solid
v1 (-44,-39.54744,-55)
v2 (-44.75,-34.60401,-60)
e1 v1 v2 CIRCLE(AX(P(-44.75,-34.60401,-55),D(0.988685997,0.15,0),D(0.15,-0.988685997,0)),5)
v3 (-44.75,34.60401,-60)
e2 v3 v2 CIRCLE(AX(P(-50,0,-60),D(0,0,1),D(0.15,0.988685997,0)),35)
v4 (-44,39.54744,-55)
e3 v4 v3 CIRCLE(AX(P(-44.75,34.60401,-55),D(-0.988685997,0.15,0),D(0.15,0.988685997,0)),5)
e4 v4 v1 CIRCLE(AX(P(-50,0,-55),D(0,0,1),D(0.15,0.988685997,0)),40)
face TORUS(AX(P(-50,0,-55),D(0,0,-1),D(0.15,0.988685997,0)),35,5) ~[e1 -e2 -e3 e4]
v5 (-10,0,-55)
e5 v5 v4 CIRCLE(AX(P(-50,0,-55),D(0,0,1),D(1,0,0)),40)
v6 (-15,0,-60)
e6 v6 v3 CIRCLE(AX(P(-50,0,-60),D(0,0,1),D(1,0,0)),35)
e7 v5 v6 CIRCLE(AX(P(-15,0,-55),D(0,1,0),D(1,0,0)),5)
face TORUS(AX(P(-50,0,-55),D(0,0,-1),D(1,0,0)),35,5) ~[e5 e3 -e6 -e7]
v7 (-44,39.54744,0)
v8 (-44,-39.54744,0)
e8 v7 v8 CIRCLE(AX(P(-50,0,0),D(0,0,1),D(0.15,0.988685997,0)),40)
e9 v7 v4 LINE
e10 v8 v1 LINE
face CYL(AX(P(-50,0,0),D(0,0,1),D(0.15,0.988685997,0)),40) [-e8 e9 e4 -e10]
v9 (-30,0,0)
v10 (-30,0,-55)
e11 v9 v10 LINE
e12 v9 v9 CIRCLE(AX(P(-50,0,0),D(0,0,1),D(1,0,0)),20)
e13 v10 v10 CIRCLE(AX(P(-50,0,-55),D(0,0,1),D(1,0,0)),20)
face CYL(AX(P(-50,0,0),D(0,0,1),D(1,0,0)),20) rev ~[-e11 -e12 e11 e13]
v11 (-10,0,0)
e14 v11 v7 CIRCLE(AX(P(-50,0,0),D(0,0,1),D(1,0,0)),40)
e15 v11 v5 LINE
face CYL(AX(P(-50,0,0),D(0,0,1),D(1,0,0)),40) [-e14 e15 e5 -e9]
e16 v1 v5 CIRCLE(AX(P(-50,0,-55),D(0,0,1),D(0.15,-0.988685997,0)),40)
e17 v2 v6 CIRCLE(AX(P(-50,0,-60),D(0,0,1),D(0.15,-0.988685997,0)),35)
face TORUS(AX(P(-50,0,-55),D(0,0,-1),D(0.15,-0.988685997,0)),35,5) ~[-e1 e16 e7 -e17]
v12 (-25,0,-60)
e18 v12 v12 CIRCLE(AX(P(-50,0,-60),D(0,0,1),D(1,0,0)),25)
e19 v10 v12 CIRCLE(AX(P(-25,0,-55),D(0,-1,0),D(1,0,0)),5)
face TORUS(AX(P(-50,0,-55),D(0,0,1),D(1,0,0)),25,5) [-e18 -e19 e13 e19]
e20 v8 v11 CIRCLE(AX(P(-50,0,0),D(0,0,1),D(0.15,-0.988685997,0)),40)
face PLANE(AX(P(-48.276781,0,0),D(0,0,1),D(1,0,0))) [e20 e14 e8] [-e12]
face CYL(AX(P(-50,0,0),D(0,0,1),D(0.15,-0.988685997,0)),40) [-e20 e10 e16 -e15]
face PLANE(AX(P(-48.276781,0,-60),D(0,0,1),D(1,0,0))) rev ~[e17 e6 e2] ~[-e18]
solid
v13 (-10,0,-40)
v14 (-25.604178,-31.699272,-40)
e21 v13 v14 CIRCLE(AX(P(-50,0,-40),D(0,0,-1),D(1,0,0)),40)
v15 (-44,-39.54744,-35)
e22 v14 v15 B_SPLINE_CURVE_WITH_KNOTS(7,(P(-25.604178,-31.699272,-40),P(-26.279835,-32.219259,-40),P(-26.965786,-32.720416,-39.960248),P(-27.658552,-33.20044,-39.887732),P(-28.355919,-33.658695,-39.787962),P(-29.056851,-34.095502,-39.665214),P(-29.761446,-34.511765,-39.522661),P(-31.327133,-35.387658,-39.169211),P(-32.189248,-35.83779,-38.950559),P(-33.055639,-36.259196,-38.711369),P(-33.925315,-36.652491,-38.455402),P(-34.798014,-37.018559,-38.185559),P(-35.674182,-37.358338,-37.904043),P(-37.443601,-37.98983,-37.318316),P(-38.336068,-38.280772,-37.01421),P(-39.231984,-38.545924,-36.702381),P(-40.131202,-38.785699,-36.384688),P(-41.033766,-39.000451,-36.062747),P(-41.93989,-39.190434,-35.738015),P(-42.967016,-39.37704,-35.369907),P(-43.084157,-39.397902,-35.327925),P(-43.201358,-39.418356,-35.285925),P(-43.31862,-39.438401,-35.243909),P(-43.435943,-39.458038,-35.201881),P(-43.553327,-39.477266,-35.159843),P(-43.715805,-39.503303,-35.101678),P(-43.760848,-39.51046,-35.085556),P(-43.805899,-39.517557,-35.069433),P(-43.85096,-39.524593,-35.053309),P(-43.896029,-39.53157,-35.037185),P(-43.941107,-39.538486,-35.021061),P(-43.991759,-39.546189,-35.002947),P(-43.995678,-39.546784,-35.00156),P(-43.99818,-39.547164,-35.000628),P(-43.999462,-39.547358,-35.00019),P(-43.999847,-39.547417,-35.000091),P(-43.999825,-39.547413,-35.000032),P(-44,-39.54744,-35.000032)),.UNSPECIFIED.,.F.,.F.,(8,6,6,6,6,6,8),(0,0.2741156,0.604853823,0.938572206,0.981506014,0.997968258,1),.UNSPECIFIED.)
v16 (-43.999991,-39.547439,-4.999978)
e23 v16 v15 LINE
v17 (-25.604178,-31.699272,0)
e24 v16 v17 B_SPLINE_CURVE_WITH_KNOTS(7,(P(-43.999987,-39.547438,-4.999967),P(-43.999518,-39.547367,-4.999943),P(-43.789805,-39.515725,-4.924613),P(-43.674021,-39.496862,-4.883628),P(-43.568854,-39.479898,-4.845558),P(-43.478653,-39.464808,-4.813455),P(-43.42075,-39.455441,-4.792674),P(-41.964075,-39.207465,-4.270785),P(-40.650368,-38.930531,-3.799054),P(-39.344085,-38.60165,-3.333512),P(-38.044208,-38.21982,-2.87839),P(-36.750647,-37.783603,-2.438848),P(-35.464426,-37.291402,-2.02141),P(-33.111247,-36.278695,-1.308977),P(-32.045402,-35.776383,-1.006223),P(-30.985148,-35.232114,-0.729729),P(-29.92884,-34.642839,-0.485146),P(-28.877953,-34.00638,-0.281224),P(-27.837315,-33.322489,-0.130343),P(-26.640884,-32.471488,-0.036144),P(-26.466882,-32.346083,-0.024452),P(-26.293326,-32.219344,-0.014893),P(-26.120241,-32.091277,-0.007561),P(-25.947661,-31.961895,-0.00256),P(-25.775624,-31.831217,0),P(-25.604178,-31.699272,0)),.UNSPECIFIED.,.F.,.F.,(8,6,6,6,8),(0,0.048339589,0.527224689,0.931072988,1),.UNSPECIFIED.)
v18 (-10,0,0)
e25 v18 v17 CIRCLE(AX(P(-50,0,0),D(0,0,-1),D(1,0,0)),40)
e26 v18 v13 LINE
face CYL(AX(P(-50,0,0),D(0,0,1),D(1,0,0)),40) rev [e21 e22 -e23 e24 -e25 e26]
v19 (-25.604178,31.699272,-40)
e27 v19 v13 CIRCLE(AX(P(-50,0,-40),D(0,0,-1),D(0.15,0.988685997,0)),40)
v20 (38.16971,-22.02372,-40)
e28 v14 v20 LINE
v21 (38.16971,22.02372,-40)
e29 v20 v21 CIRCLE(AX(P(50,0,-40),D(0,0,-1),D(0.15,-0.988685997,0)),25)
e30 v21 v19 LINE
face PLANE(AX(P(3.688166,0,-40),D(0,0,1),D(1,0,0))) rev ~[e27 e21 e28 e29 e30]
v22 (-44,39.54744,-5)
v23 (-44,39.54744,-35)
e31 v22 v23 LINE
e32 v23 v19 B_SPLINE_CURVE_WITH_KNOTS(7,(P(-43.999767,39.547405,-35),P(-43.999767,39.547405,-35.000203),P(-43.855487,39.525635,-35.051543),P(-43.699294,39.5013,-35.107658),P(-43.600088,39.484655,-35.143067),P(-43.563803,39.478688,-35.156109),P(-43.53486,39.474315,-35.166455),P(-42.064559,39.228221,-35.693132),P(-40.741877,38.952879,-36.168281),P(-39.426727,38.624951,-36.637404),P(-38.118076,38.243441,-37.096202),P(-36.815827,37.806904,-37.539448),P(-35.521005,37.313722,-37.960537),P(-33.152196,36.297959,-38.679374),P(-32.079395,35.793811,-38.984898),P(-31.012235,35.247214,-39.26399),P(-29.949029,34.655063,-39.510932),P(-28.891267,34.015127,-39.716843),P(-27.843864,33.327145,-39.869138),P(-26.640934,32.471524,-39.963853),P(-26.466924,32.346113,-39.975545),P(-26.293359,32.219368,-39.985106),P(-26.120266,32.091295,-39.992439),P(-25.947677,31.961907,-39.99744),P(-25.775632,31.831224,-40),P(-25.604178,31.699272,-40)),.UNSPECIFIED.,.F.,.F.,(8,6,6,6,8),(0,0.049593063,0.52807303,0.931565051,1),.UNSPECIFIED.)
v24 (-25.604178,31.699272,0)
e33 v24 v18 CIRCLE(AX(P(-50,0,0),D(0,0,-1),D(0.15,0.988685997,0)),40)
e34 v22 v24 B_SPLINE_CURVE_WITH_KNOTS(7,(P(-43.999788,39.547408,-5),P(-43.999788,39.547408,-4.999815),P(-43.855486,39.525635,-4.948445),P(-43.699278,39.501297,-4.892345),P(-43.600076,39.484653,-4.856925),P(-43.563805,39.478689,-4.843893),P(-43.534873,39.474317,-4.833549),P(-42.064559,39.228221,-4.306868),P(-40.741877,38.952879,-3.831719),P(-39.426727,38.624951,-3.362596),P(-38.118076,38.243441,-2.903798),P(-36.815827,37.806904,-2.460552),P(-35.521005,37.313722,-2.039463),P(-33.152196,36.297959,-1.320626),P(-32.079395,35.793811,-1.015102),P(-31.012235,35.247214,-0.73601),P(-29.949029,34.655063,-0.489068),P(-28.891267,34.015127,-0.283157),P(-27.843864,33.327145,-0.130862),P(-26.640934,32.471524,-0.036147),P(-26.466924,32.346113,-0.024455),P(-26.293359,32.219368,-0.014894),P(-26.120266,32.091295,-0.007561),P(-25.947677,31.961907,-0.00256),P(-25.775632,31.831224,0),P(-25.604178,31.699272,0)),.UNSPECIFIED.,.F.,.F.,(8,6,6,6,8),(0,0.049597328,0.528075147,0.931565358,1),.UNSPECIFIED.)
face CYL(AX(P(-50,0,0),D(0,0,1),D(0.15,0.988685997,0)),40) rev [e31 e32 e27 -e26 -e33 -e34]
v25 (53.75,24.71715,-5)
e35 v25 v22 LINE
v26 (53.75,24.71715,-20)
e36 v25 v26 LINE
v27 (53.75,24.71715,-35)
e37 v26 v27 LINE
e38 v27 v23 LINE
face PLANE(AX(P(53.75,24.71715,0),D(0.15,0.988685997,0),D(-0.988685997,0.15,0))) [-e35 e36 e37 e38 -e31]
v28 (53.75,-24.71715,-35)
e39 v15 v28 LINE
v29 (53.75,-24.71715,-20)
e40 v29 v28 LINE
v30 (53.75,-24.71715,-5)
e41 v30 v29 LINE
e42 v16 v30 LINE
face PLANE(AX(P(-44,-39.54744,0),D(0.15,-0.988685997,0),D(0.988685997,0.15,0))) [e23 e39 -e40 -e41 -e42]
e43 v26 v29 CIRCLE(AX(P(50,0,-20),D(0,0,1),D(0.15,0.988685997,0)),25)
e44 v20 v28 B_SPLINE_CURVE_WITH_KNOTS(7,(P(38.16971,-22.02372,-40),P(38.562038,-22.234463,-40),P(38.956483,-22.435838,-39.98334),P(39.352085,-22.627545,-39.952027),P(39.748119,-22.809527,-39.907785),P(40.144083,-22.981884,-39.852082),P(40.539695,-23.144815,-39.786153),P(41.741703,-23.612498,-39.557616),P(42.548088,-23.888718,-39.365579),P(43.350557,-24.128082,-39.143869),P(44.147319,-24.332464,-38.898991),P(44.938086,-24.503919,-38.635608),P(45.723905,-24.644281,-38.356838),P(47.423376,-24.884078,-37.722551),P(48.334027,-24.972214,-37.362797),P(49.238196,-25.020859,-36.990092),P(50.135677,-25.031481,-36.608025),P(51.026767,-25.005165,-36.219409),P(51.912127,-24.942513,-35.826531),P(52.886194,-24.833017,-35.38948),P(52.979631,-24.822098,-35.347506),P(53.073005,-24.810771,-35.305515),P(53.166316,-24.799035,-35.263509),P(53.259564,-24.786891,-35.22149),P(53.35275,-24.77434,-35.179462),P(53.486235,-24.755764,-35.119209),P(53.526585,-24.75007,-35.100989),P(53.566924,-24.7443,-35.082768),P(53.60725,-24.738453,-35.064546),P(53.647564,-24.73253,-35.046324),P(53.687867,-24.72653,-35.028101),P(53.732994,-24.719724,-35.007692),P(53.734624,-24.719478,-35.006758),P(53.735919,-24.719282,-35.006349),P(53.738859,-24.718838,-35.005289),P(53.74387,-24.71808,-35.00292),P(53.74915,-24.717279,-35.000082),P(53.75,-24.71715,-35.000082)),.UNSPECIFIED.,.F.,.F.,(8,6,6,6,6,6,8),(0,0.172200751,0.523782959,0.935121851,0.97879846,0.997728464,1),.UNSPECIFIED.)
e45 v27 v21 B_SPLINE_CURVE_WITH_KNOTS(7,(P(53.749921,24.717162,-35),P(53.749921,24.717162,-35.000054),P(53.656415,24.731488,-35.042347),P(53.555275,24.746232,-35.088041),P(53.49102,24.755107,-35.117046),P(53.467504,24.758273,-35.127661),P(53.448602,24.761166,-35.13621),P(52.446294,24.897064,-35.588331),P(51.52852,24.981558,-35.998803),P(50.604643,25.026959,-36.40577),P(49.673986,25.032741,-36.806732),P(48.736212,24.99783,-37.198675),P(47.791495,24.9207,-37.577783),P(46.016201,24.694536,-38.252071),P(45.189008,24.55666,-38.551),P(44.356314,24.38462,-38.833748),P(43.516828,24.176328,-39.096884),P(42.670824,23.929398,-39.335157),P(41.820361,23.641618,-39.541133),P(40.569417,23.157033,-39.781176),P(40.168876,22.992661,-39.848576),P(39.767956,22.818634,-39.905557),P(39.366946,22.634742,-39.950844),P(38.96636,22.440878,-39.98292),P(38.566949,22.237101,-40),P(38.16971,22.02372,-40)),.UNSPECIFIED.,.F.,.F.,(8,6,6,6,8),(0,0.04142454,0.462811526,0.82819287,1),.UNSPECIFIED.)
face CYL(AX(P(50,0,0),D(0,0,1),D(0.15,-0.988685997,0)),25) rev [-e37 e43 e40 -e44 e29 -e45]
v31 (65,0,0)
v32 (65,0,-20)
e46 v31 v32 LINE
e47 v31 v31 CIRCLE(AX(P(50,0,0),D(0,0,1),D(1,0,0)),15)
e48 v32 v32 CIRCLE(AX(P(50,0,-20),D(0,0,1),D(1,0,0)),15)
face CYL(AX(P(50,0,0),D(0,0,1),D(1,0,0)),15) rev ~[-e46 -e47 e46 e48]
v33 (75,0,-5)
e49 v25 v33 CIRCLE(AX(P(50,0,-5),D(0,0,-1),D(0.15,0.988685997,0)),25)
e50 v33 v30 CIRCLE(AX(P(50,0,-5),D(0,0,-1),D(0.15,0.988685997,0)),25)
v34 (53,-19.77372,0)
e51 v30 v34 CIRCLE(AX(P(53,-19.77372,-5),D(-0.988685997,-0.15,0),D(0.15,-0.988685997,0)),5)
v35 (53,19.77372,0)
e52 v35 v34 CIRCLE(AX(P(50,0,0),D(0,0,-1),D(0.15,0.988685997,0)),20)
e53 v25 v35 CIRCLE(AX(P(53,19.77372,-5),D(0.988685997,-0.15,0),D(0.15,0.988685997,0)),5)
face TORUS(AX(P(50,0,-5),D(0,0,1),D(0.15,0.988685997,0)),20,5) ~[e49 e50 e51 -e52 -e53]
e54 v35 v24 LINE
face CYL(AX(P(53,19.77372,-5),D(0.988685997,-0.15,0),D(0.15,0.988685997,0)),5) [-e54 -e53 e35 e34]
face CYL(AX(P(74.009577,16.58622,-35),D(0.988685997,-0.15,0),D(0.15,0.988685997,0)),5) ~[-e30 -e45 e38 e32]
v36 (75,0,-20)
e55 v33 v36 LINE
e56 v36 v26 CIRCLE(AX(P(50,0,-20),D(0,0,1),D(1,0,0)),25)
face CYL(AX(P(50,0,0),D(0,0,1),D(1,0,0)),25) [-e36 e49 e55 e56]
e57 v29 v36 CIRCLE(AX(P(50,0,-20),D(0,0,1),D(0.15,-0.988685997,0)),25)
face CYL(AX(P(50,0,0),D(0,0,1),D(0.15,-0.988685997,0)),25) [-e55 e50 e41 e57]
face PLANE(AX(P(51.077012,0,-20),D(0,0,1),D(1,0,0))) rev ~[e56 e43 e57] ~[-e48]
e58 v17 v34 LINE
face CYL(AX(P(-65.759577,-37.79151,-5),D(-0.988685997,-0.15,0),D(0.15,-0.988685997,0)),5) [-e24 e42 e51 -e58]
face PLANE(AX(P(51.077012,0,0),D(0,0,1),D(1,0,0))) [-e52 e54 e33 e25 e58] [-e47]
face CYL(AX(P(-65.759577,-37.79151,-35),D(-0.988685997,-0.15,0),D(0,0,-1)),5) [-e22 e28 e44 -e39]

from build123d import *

# Parameters (mm, degrees)
F0_R         = 20
F1_DEPTH     = 60
F2_DEPTH     = 40
F0_R_2       = 15
F3_DEPTH     = 20
F4_R         = 5
F5_T1_DEPTH  = 141.3685996664
F5_T3_DEPTH  = 141.3685996664
F5_T5_DEPTH  = 120.1185996664
F5_T7_DEPTH  = 120.1185996664
F5_T10_ANGLE = 162.7461468826


# Not quite as in the source:
# - a fillet or chamfer that OpenCascade refuses, or shapes differently, is made with other operations: its cross-section is extruded or revolved along the edge and cut away or added
# - two fillets or chamfers of one size are made in one step


with BuildPart() as f1:
    # F0 (on Top) → F1 (new body)
    with BuildSketch(Plane.XY):
        with BuildLine():
            ThreePointArc((-44, -39.5474398666), (-19.6684982238, -26.0768096208), (-10, 0))
            ThreePointArc((-10, 0), (-19.6684982238, 26.0768096208), (-44, 39.5474398666))
            ThreePointArc((-44, 39.5474398666), (-90, 0), (-44, -39.5474398666))
        make_face()
        with Locations((-50, 0)):
            Circle(F0_R, mode=Mode.SUBTRACT)
    extrude(amount=-F1_DEPTH)

    # F4
    f4_edges = [f1.edges().sort_by_distance(p)[0] for p in [
        (-56, 39.54744, -60),
        (-70, 0, -60),
    ]]
    fillet(f4_edges, radius=F4_R)


with BuildPart() as f2:
    # F0 (on Top) → F2 (new body)
    with BuildSketch(Plane.XY):
        with BuildLine():
            ThreePointArc((-44, 39.5474398666), (-19.6684982238, 26.0768096208), (-10, 0))
            ThreePointArc((-10, 0), (-19.6684982238, -26.0768096208), (-44, -39.5474398666))
            Line((-44, -39.5474398666), (53.75, -24.7171499166))
            ThreePointArc((53.75, -24.7171499166), (25, 0), (53.75, 24.7171499166))
            Line((53.75, 24.7171499166), (-44, 39.5474398666))
        make_face()
    extrude(amount=-F2_DEPTH)

    # F0 (on Top) → F3 (join)
    with BuildSketch(Plane.XY):
        with BuildLine():
            ThreePointArc((75, 0), (68.9571886101, 16.298006013), (53.75, 24.7171499166))
            ThreePointArc((53.75, 24.7171499166), (25, 0), (53.75, -24.7171499166))
            ThreePointArc((53.75, -24.7171499166), (68.9571886101, -16.298006013), (75, 0))
        make_face()
        with Locations((50, 0)):
            Circle(F0_R_2, mode=Mode.SUBTRACT)
    extrude(amount=-F3_DEPTH)

    # F5: fillet of radius 5 on 9 edges, made by hand

    # F5_s2 → F5_t1 (cut)
    with BuildSketch(Plane(origin=(69.8845774291, -10.602644975, 0), x_dir=(0, 0, 1), z_dir=(-0.9886859967, 0.15, 0))):
        with BuildLine():
            ThreePointArc((-35, 32.5), (-38.5355339059, 31.0355339059), (-40, 27.5))
            Line((-40, 27.5), (-40, 32.5))
            Line((-40, 32.5), (-35, 32.5))
        make_face()
    extrude(amount=F5_T1_DEPTH, mode=Mode.SUBTRACT)

    # F5_s4 → F5_t3 (cut)
    with BuildSketch(Plane(origin=(-69.8845774291, -10.602644975, 0), x_dir=(0, 0, 1), z_dir=(0.9886859967, 0.15, 0))):
        with BuildLine():
            ThreePointArc((-40, 27.5), (-38.5355339059, 31.0355339059), (-35, 32.5))
            Line((-35, 32.5), (-40, 32.5))
            Line((-40, 32.5), (-40, 27.5))
        make_face()
    extrude(amount=F5_T3_DEPTH, mode=Mode.SUBTRACT)

    # F5_s6 → F5_t5 (cut)
    with BuildSketch(Plane(origin=(48.875, -7.415144975, 0), x_dir=(0, 0, 1), z_dir=(-0.9886859967, 0.15, 0))):
        with BuildLine():
            ThreePointArc((-5, 32.5), (-1.4644660941, 31.0355339059), (0, 27.5))
            Line((0, 27.5), (0, 32.5))
            Line((0, 32.5), (-5, 32.5))
        make_face()
    extrude(amount=F5_T5_DEPTH, mode=Mode.SUBTRACT)

    # F5_s8 → F5_t7 (cut)
    with BuildSketch(Plane(origin=(-69.8845774291, -10.602644975, 0), x_dir=(0, 0, 1), z_dir=(0.9886859967, 0.15, 0))):
        with BuildLine():
            ThreePointArc((-5, 32.5), (-1.4644660941, 31.0355339059), (0, 27.5))
            Line((0, 27.5), (0, 32.5))
            Line((0, 32.5), (-5, 32.5))
        make_face()
    extrude(amount=F5_T7_DEPTH, mode=Mode.SUBTRACT)

    # F5_s9 → F5_t10 (revolve, cut)
    with BuildSketch(Plane(origin=(48.875, -7.415144975, 0), x_dir=(0, 0, 1), z_dir=(-0.9886859967, 0.15, 0))):
        with BuildLine():
            ThreePointArc((-5, 32.5), (-1.4644660941, 31.0355339059), (0, 27.5))
            Line((0, 27.5), (0, 32.5))
            Line((0, 32.5), (-5, 32.5))
        make_face()
    revolve(axis=Axis((50, 0, 0), (0, 0, -1)), revolution_arc=F5_T10_ANGLE, mode=Mode.SUBTRACT)


solid = Compound([f1.part, f2.part])
